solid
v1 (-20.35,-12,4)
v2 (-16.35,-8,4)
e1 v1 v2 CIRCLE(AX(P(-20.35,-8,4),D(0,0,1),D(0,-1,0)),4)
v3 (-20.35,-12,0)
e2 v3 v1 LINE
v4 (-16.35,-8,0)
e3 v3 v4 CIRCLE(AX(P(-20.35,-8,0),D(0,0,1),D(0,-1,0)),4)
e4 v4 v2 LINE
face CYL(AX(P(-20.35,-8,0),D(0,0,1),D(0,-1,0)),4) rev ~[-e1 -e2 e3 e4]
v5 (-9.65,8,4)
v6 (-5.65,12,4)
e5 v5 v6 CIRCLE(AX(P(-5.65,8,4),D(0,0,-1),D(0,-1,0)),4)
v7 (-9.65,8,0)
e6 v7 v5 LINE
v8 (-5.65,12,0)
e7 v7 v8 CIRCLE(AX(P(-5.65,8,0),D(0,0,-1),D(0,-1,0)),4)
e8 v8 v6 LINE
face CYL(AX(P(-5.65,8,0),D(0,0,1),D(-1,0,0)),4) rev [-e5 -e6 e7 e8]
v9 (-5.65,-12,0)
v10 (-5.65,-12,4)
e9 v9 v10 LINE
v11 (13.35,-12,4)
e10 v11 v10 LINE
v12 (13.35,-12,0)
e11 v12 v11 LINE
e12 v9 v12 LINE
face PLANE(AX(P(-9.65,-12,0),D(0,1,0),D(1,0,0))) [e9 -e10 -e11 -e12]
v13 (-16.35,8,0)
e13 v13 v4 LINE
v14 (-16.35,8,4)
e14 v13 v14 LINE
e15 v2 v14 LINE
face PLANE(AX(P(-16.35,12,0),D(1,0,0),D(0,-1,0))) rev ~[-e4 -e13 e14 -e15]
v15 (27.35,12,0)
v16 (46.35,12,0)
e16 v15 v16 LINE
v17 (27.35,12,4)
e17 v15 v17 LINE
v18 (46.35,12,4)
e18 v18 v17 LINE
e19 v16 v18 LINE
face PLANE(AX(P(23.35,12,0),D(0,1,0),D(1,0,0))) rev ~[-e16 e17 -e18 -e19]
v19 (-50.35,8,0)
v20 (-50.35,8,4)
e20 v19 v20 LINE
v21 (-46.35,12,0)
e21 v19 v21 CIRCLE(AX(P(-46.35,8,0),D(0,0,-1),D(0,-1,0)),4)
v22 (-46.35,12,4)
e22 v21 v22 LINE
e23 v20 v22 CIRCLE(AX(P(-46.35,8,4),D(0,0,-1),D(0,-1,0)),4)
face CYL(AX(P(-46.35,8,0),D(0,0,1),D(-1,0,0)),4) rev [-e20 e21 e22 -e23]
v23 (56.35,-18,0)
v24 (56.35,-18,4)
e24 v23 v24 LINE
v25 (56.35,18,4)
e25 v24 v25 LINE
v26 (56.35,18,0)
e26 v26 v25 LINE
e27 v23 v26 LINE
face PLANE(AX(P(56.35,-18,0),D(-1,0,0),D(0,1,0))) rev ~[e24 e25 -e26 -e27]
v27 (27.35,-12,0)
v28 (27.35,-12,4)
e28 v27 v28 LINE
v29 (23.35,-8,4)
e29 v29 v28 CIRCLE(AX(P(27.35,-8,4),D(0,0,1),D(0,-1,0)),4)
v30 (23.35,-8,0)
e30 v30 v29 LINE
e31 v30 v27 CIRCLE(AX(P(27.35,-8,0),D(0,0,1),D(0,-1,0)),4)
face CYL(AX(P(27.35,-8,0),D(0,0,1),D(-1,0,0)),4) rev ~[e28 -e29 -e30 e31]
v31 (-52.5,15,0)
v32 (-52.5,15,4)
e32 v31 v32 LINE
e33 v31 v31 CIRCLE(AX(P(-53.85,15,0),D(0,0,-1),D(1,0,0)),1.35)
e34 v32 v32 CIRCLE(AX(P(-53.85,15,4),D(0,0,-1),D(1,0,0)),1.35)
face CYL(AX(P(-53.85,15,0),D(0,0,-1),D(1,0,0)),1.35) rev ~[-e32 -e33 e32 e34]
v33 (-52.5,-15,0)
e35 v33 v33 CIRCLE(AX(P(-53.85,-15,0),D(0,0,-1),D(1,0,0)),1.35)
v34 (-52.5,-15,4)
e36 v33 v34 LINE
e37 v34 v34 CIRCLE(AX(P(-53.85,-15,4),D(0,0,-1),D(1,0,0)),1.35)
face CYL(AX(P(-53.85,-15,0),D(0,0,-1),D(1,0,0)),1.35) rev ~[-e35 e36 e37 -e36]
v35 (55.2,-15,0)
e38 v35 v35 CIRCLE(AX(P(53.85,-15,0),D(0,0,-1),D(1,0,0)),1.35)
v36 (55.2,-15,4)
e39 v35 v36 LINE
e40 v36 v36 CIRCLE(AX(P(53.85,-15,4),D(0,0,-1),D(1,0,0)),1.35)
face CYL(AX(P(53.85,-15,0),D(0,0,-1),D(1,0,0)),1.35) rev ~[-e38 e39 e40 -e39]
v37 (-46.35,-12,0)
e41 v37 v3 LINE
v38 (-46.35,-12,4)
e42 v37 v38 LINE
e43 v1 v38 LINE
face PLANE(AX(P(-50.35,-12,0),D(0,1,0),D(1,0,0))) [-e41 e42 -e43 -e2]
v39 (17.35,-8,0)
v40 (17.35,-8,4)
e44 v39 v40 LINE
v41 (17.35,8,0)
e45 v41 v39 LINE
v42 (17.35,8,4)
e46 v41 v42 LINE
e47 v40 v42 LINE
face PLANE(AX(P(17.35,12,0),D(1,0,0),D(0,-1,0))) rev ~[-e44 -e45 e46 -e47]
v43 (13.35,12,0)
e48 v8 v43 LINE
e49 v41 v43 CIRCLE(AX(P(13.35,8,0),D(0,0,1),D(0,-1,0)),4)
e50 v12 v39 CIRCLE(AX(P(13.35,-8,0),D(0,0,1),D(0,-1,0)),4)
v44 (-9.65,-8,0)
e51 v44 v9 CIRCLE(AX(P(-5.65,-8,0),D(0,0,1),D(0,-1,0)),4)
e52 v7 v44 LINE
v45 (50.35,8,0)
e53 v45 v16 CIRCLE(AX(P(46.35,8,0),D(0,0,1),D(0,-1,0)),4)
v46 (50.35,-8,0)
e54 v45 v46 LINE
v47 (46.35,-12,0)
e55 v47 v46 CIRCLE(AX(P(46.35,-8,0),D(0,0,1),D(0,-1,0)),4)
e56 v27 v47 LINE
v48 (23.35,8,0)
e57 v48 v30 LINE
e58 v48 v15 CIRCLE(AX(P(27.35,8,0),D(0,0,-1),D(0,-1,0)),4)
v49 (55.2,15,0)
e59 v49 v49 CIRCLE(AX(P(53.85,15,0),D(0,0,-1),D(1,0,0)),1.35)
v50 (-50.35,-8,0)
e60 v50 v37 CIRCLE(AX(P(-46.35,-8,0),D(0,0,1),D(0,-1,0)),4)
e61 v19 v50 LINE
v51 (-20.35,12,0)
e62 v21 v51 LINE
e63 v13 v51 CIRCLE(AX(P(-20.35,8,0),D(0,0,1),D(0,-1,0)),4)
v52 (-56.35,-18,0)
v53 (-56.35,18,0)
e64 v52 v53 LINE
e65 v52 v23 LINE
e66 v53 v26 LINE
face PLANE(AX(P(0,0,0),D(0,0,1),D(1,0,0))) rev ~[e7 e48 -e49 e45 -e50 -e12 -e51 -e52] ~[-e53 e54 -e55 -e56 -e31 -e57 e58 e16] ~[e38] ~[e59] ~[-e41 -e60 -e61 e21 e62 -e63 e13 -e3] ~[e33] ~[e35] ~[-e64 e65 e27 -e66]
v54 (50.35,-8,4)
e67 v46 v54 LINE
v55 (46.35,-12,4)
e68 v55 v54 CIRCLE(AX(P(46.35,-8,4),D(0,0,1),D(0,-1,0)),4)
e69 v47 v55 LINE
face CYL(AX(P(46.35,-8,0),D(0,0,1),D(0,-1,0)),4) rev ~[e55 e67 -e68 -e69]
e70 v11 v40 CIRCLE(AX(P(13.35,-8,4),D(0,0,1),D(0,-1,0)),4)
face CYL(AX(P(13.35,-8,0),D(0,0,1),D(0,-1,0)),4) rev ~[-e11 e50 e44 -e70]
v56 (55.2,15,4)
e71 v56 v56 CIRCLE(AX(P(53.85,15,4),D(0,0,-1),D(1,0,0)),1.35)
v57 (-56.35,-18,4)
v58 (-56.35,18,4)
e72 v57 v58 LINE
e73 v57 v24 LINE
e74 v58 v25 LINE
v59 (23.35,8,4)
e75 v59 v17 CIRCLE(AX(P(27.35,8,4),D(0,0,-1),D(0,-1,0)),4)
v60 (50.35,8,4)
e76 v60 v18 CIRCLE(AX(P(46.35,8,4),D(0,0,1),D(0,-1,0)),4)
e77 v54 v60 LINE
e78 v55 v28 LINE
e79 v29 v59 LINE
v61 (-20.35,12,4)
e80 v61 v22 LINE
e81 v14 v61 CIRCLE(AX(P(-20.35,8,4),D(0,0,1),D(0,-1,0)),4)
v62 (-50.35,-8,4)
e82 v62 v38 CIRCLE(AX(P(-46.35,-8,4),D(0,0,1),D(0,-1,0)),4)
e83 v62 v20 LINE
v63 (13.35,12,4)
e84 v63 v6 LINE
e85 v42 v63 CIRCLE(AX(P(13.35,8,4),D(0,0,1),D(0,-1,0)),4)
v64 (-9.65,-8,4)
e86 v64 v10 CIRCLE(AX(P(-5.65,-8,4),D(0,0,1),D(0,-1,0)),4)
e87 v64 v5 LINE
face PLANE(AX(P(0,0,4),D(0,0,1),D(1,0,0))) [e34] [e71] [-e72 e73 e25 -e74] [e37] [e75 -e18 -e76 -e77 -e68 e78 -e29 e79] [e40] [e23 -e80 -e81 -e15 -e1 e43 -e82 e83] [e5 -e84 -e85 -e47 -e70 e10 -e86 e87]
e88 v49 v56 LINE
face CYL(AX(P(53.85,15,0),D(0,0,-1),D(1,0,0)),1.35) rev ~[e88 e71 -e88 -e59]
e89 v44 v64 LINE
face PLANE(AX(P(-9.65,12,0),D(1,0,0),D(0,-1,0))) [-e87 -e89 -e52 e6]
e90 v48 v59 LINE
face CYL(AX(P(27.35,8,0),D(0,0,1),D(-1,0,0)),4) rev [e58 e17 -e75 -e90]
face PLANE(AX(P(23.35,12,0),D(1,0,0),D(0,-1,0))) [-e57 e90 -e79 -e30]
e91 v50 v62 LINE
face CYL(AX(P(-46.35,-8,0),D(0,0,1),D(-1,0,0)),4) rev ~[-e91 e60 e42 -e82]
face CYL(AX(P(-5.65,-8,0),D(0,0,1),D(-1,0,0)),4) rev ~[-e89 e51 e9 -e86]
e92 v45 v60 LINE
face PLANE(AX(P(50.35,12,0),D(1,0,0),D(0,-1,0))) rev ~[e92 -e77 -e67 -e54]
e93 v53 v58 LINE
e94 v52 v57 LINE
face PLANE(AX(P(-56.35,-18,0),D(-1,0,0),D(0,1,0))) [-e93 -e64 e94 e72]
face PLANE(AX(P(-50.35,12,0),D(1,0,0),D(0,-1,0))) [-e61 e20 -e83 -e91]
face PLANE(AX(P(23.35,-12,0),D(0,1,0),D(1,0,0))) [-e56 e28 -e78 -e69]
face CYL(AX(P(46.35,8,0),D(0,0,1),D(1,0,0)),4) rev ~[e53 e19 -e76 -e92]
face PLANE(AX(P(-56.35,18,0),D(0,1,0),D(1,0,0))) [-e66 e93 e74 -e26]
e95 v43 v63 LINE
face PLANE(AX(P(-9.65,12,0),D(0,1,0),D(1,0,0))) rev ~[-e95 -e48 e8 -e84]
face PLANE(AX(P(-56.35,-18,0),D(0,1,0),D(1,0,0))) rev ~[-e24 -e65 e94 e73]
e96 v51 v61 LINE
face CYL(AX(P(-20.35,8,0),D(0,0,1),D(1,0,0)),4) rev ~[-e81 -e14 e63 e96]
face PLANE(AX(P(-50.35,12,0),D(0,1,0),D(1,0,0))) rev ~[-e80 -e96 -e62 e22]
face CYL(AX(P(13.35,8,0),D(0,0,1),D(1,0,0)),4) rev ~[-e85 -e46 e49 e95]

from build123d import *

# Parameters (mm, degrees)
F0_W     = 112.7
F0_H     = 36
F1_DEPTH = 4
F2_R     = 1.35
F3_DEPTH = 4.001
F4_W     = 34
F4_H     = 24
F4_W_2   = 27
F5_DEPTH = 4.001
F6_R     = 4


# Not quite as in the source:
# - a feature names something its author has since deleted; it is built from what else it names


with BuildPart() as f1:
    # F0 (on Top) → F1 (new body)
    with BuildSketch(Plane.XY):
        Rectangle(F0_W, F0_H)
    extrude(amount=F1_DEPTH)

    # F2 (on face) → F3 (cut, through all)
    with BuildSketch(Plane(origin=(0, 0, 0), x_dir=(1, 0, 0), z_dir=(0, 0, -1))):
        with Locations((-53.85, 15)):
            Circle(F2_R)
        with Locations((-53.85, -15)):
            Circle(F2_R)
        with Locations((53.85, 15)):
            Circle(F2_R)
        with Locations((53.85, -15)):
            Circle(F2_R)
    extrude(amount=-F3_DEPTH, mode=Mode.SUBTRACT)

    # F4 (on face) → F5 (cut, through all)
    with BuildSketch(Plane(origin=(0, 0, 0), x_dir=(1, 0, 0), z_dir=(0, 0, -1))):
        with Locations((-33.35, 0)):
            Rectangle(F4_W, F4_H)
        with Locations((3.85, 0)):
            Rectangle(F4_W_2, F4_H)
        with Locations((36.85, 0)):
            Rectangle(F4_W_2, F4_H)
    extrude(amount=-F5_DEPTH, mode=Mode.SUBTRACT)

    # F6
    f6_edges = [f1.edges().sort_by_distance(p)[0] for p in [
        (-16.35, -12, 2),
        (-50.35, -12, 2),
        (-50.35, 12, 2),
        (-16.35, 12, 2),
        (-9.65, -12, 2),
        (23.35, -12, 2),
        (-9.65, 12, 2),
        (17.35, -12, 2),
        (50.35, -12, 2),
        (50.35, 12, 2),
        (23.35, 12, 2),
        (17.35, 12, 2),
    ]]
    fillet(f6_edges, radius=F6_R)


solid = f1.part
